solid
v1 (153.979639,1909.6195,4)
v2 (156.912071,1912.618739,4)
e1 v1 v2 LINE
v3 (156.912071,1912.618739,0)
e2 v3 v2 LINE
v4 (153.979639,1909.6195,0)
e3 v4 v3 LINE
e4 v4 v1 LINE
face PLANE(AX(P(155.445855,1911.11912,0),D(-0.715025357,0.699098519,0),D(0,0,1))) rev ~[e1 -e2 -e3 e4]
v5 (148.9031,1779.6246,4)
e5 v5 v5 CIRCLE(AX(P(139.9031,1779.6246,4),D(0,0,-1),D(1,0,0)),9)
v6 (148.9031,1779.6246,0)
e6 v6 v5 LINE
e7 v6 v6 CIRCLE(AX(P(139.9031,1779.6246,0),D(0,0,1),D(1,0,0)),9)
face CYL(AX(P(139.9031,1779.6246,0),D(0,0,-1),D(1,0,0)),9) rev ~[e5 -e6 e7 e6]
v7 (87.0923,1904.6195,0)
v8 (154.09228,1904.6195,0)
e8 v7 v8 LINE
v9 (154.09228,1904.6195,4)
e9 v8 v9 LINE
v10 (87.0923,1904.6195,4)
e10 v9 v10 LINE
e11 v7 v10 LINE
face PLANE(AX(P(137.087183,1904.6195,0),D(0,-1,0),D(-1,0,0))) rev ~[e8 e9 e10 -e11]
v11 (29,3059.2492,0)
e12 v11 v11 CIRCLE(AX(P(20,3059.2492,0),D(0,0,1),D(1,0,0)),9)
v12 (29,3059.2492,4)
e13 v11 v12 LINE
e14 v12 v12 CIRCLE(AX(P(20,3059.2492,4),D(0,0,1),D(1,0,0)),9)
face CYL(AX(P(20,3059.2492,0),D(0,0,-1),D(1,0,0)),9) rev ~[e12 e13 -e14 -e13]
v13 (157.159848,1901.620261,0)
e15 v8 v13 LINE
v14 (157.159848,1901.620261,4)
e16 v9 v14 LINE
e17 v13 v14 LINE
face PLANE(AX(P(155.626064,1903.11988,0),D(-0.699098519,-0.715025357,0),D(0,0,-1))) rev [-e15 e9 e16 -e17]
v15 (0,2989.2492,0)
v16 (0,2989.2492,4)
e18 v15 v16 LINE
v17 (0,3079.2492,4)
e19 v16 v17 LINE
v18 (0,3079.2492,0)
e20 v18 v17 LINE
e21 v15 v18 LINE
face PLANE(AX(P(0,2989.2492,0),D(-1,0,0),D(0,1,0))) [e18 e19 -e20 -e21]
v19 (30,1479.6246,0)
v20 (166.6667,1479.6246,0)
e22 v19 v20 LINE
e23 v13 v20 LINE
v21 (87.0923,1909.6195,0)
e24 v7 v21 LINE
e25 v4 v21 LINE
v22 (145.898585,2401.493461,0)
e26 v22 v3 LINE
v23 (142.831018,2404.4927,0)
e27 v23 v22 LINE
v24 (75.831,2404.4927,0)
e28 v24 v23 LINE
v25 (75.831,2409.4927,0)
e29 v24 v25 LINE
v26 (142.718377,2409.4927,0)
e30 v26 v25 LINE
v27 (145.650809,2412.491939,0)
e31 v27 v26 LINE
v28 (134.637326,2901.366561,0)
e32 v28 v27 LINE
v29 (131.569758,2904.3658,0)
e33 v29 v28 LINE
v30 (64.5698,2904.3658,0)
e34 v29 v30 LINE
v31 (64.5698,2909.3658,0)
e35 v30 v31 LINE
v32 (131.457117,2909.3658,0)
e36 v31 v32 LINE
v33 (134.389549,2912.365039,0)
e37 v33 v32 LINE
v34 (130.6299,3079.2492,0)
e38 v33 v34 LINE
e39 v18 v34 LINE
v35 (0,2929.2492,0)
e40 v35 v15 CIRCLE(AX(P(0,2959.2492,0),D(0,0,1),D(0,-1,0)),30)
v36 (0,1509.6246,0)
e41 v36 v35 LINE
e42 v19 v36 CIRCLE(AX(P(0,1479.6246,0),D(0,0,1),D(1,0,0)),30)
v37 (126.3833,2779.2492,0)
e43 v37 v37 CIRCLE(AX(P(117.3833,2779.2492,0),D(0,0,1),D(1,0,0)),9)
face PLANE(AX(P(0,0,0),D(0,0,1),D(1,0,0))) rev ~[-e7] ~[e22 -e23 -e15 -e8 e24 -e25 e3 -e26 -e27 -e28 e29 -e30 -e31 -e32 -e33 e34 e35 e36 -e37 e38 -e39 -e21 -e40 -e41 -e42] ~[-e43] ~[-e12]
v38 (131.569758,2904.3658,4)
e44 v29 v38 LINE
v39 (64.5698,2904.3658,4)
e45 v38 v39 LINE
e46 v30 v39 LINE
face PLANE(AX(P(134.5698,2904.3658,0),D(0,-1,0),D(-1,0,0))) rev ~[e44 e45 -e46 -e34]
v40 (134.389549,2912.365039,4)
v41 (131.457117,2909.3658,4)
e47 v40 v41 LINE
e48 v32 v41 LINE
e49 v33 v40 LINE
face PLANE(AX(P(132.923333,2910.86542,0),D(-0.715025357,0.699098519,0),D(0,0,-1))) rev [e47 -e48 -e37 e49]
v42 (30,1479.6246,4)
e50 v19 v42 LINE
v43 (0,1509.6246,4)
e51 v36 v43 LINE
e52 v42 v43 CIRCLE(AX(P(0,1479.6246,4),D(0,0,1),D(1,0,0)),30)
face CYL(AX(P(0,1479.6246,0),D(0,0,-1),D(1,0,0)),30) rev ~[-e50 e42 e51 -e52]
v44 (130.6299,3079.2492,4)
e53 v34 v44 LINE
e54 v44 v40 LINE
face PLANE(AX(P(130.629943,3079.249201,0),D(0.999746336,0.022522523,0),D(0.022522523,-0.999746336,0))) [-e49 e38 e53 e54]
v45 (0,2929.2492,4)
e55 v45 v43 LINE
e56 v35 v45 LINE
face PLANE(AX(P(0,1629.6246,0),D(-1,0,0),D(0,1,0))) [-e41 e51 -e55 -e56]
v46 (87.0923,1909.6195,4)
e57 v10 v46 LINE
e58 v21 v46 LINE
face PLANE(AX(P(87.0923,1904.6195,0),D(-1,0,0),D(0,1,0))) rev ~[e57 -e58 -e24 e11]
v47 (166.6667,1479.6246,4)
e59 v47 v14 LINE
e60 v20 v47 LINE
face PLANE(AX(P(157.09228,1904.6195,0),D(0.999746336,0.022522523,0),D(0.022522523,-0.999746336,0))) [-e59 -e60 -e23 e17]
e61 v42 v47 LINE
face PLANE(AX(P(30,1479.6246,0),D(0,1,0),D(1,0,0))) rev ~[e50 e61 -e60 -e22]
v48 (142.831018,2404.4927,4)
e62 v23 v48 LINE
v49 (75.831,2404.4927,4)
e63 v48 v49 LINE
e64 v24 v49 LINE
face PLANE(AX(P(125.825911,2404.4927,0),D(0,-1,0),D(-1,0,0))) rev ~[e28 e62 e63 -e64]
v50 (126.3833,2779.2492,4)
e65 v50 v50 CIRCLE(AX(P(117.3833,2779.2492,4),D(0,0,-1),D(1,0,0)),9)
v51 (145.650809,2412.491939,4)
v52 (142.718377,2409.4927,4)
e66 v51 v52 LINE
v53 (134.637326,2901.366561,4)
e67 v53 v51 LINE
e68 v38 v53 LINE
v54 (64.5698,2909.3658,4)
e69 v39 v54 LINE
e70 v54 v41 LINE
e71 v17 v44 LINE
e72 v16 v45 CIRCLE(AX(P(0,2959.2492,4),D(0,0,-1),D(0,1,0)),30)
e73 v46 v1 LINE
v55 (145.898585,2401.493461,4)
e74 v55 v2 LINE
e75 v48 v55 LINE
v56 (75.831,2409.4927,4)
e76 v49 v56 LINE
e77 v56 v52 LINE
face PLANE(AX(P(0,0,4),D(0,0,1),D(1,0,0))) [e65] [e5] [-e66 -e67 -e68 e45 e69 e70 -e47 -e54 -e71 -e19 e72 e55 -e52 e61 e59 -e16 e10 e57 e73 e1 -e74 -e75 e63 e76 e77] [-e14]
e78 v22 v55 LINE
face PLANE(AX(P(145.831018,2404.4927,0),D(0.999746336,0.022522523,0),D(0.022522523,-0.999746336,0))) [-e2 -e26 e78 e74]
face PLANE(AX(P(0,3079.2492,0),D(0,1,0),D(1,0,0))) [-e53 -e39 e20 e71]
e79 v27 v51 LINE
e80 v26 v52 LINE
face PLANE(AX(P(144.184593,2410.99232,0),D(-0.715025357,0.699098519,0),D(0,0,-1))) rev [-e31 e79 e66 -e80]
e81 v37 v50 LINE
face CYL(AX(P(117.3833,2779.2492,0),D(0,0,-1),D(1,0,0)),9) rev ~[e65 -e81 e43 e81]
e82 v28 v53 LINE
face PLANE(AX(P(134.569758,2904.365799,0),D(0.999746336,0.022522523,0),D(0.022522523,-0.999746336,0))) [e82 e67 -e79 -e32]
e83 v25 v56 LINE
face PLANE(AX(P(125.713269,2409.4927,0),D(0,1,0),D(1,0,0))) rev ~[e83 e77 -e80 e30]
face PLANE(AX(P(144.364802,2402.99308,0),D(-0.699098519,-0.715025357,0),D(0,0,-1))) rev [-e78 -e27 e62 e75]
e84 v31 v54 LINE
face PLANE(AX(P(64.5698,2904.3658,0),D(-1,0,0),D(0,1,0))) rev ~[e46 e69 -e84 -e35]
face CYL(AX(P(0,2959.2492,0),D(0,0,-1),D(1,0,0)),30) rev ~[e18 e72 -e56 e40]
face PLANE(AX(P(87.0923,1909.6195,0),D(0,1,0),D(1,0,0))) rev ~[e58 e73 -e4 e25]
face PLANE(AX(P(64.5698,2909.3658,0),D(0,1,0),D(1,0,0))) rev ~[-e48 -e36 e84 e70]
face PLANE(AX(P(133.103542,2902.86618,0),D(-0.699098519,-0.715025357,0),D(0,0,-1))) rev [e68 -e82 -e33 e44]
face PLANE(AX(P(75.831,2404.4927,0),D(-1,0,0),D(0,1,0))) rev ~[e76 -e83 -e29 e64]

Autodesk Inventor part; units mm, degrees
ref_plane "YZ Plane" through (0, 0, 0) normal (1, 0, 0) x (0, 1, 0)
ref_plane "XZ Plane" through (0, 0, 0) normal (0, 1, 0) x (-1, 0, 0)
ref_plane "XY Plane" through (0, 0, 0) normal (0, 0, 1) x (1, 0, 0)
sketch "Sketch1" plane through (0, 0, 0) normal (0, 0, 1) x (1, 0, 0)
  line L0 (0, 0) -> (0, 4438.8737)
  line L1 (0, 4438.8737) -> (100, 4438.8737)
  line L2 (100, 4438.8737) -> (200, 0)
  line L3 (200, 0) -> (0, 0)
  circle A0 centre (0, 0) radius 30
  line L4 (0, 1479.6246) -> (166.6667, 1479.6246)
  line L5 (0, 2959.2492) -> (133.3333, 2959.2492)
  circle A1 centre (0, 1479.6246) radius 30
  circle A2 centre (0, 2959.2492) radius 30
  line L6 (190.8761, 405) -> (120.8761, 405)
  line L7 (120.8761, 405) -> (120.8761, 410)
  line L8 (120.8761, 410) -> (190.8761, 410)
  line L9 (190.8761, 410) -> (190.8761, 405)
  line L10 (109.6148, 909.8732) -> (179.6148, 909.8732)
  line L11 (179.6148, 904.8732) -> (109.6148, 904.8732)
  line L12 (109.6148, 904.8732) -> (109.6148, 909.8732)
  line L13 (179.6148, 909.8732) -> (179.6148, 904.8732)
  line L14 (98.3535, 1409.7463) -> (168.3535, 1409.7463)
  line L15 (168.3535, 1404.7463) -> (98.3535, 1404.7463)
  line L16 (98.3535, 1404.7463) -> (98.3535, 1409.7463)
  line L17 (168.3535, 1409.7463) -> (168.3535, 1404.7463)
  line L18 (87.0923, 1909.6195) -> (157.0923, 1909.6195)
  line L19 (157.0923, 1904.6195) -> (87.0923, 1904.6195)
  line L20 (87.0923, 1904.6195) -> (87.0923, 1909.6195)
  line L21 (157.0923, 1909.6195) -> (157.0923, 1904.6195)
  line L22 (75.831, 2409.4927) -> (145.831, 2409.4927)
  line L23 (145.831, 2404.4927) -> (75.831, 2404.4927)
  line L24 (75.831, 2404.4927) -> (75.831, 2409.4927)
  line L25 (145.831, 2409.4927) -> (145.831, 2404.4927)
  line L26 (64.5698, 2909.3658) -> (134.5698, 2909.3658)
  line L27 (134.5698, 2904.3658) -> (64.5698, 2904.3658)
  line L28 (64.5698, 2904.3658) -> (64.5698, 2909.3658)
  line L29 (134.5698, 2909.3658) -> (134.5698, 2904.3658)
  line L30 (53.3085, 3409.239) -> (123.3085, 3409.239)
  line L31 (123.3085, 3404.239) -> (53.3085, 3404.239)
  line L32 (53.3085, 3404.239) -> (53.3085, 3409.239)
  line L33 (123.3085, 3409.239) -> (123.3085, 3404.239)
  line L34 (42.0472, 3909.1122) -> (112.0472, 3909.1122)
  line L35 (112.0472, 3904.1122) -> (42.0472, 3904.1122)
  line L36 (42.0472, 3904.1122) -> (42.0472, 3909.1122)
  line L37 (112.0472, 3909.1122) -> (112.0472, 3904.1122)
  line L38 (0, 1629.6246) -> (163.2874, 1629.6246)
  line L39 (0, 3079.2492) -> (130.6299, 3079.2492)
  circle A3 centre (20, 3059.2492) radius 9
  circle A4 centre (117.3833, 2779.2492) radius 9
  circle A5 centre (139.9031, 1779.6246) radius 9
  line L40 (139.9031, 1779.6246) -> (117.3833, 2779.2492)
  point P0 (30, 2959.2492)
  point P1 (0, 2929.2492)
  point P2 (0, 1509.6246)
  point P3 (0, 1449.6246)
  point P4 (0, 30)
  point P5 (30, 0)
  point P6 (190.7634, 410)
  point P7 (179.5022, 909.8732)
  point P8 (168.3535, 1404.7463)
  point P9 (168.2409, 1409.7463)
  point P10 (30, 1479.6246)
  point P11 (157.0923, 1904.6195)
  point P12 (156.9796, 1909.6195)
  point P13 (145.831, 2404.4927)
  point P14 (145.7184, 2409.4927)
  point P15 (134.5698, 2904.3658)
  point P16 (134.4571, 2909.3658)
  point P17 (0, 2989.2492)
  dimension "d65" = 100
  dimension "d67" = 200
  dimension "d68" = 60
  dimension "d69" = 1480
  dimension "d70" = 1480
  dimension "d71" = 1480
  dimension "d72" = 5
  dimension "d73" = 70
  dimension "d74" = 410
  dimension "d77" = 500
  dimension "d82" = 120
  dimension "d83" = 150
  dimension "d88" = 18
  dimension "d89" = 20
  dimension "d90" = 20
  dimension "d91" = 20
  dimension "d92" = 300
  dimension "d93" = 300
extrude "Plate3" add sketch "Sketch1" along normal blind 4 contours L39 L2 L5 A2 L0 | L5 L2 L26 L28 L27 L22 L24 L23 L40 L18 L20 L19 L38 L0 A2 | L38 L2 L4 A1 L0 | L18 L40 L23 L2
chamfer "Corner Chamfer2" distance 3 angle 45 6 edges at (157.0923, 1904.6195, 2) (156.9796, 1909.6195, 2) (145.831, 2404.4927, 2) (145.7184, 2409.4927, 2) (134.5698, 2904.3658, 2) (134.4571, 2909.3658, 2)
equation "\"BendRadius\" = Thickness"
equation "\"BendReliefWidth\" = Thickness"
equation "\"BendReliefDepth\" = 0.5 * Thickness"
equation "\"CornerReliefSize\" = 4 * Thickness"
equation "\"MinimumRemnant\" = 2 * Thickness"
equation "\"TransitionRadius\" = BendRadius"
equation "\"JacobiRadiusSize\" = BendRadius"
equation "\"GapSize\" = Thickness"
equation "\"Thickness\" = 4"
properties part number "GBK 3212 central second rib" material "Steel"
